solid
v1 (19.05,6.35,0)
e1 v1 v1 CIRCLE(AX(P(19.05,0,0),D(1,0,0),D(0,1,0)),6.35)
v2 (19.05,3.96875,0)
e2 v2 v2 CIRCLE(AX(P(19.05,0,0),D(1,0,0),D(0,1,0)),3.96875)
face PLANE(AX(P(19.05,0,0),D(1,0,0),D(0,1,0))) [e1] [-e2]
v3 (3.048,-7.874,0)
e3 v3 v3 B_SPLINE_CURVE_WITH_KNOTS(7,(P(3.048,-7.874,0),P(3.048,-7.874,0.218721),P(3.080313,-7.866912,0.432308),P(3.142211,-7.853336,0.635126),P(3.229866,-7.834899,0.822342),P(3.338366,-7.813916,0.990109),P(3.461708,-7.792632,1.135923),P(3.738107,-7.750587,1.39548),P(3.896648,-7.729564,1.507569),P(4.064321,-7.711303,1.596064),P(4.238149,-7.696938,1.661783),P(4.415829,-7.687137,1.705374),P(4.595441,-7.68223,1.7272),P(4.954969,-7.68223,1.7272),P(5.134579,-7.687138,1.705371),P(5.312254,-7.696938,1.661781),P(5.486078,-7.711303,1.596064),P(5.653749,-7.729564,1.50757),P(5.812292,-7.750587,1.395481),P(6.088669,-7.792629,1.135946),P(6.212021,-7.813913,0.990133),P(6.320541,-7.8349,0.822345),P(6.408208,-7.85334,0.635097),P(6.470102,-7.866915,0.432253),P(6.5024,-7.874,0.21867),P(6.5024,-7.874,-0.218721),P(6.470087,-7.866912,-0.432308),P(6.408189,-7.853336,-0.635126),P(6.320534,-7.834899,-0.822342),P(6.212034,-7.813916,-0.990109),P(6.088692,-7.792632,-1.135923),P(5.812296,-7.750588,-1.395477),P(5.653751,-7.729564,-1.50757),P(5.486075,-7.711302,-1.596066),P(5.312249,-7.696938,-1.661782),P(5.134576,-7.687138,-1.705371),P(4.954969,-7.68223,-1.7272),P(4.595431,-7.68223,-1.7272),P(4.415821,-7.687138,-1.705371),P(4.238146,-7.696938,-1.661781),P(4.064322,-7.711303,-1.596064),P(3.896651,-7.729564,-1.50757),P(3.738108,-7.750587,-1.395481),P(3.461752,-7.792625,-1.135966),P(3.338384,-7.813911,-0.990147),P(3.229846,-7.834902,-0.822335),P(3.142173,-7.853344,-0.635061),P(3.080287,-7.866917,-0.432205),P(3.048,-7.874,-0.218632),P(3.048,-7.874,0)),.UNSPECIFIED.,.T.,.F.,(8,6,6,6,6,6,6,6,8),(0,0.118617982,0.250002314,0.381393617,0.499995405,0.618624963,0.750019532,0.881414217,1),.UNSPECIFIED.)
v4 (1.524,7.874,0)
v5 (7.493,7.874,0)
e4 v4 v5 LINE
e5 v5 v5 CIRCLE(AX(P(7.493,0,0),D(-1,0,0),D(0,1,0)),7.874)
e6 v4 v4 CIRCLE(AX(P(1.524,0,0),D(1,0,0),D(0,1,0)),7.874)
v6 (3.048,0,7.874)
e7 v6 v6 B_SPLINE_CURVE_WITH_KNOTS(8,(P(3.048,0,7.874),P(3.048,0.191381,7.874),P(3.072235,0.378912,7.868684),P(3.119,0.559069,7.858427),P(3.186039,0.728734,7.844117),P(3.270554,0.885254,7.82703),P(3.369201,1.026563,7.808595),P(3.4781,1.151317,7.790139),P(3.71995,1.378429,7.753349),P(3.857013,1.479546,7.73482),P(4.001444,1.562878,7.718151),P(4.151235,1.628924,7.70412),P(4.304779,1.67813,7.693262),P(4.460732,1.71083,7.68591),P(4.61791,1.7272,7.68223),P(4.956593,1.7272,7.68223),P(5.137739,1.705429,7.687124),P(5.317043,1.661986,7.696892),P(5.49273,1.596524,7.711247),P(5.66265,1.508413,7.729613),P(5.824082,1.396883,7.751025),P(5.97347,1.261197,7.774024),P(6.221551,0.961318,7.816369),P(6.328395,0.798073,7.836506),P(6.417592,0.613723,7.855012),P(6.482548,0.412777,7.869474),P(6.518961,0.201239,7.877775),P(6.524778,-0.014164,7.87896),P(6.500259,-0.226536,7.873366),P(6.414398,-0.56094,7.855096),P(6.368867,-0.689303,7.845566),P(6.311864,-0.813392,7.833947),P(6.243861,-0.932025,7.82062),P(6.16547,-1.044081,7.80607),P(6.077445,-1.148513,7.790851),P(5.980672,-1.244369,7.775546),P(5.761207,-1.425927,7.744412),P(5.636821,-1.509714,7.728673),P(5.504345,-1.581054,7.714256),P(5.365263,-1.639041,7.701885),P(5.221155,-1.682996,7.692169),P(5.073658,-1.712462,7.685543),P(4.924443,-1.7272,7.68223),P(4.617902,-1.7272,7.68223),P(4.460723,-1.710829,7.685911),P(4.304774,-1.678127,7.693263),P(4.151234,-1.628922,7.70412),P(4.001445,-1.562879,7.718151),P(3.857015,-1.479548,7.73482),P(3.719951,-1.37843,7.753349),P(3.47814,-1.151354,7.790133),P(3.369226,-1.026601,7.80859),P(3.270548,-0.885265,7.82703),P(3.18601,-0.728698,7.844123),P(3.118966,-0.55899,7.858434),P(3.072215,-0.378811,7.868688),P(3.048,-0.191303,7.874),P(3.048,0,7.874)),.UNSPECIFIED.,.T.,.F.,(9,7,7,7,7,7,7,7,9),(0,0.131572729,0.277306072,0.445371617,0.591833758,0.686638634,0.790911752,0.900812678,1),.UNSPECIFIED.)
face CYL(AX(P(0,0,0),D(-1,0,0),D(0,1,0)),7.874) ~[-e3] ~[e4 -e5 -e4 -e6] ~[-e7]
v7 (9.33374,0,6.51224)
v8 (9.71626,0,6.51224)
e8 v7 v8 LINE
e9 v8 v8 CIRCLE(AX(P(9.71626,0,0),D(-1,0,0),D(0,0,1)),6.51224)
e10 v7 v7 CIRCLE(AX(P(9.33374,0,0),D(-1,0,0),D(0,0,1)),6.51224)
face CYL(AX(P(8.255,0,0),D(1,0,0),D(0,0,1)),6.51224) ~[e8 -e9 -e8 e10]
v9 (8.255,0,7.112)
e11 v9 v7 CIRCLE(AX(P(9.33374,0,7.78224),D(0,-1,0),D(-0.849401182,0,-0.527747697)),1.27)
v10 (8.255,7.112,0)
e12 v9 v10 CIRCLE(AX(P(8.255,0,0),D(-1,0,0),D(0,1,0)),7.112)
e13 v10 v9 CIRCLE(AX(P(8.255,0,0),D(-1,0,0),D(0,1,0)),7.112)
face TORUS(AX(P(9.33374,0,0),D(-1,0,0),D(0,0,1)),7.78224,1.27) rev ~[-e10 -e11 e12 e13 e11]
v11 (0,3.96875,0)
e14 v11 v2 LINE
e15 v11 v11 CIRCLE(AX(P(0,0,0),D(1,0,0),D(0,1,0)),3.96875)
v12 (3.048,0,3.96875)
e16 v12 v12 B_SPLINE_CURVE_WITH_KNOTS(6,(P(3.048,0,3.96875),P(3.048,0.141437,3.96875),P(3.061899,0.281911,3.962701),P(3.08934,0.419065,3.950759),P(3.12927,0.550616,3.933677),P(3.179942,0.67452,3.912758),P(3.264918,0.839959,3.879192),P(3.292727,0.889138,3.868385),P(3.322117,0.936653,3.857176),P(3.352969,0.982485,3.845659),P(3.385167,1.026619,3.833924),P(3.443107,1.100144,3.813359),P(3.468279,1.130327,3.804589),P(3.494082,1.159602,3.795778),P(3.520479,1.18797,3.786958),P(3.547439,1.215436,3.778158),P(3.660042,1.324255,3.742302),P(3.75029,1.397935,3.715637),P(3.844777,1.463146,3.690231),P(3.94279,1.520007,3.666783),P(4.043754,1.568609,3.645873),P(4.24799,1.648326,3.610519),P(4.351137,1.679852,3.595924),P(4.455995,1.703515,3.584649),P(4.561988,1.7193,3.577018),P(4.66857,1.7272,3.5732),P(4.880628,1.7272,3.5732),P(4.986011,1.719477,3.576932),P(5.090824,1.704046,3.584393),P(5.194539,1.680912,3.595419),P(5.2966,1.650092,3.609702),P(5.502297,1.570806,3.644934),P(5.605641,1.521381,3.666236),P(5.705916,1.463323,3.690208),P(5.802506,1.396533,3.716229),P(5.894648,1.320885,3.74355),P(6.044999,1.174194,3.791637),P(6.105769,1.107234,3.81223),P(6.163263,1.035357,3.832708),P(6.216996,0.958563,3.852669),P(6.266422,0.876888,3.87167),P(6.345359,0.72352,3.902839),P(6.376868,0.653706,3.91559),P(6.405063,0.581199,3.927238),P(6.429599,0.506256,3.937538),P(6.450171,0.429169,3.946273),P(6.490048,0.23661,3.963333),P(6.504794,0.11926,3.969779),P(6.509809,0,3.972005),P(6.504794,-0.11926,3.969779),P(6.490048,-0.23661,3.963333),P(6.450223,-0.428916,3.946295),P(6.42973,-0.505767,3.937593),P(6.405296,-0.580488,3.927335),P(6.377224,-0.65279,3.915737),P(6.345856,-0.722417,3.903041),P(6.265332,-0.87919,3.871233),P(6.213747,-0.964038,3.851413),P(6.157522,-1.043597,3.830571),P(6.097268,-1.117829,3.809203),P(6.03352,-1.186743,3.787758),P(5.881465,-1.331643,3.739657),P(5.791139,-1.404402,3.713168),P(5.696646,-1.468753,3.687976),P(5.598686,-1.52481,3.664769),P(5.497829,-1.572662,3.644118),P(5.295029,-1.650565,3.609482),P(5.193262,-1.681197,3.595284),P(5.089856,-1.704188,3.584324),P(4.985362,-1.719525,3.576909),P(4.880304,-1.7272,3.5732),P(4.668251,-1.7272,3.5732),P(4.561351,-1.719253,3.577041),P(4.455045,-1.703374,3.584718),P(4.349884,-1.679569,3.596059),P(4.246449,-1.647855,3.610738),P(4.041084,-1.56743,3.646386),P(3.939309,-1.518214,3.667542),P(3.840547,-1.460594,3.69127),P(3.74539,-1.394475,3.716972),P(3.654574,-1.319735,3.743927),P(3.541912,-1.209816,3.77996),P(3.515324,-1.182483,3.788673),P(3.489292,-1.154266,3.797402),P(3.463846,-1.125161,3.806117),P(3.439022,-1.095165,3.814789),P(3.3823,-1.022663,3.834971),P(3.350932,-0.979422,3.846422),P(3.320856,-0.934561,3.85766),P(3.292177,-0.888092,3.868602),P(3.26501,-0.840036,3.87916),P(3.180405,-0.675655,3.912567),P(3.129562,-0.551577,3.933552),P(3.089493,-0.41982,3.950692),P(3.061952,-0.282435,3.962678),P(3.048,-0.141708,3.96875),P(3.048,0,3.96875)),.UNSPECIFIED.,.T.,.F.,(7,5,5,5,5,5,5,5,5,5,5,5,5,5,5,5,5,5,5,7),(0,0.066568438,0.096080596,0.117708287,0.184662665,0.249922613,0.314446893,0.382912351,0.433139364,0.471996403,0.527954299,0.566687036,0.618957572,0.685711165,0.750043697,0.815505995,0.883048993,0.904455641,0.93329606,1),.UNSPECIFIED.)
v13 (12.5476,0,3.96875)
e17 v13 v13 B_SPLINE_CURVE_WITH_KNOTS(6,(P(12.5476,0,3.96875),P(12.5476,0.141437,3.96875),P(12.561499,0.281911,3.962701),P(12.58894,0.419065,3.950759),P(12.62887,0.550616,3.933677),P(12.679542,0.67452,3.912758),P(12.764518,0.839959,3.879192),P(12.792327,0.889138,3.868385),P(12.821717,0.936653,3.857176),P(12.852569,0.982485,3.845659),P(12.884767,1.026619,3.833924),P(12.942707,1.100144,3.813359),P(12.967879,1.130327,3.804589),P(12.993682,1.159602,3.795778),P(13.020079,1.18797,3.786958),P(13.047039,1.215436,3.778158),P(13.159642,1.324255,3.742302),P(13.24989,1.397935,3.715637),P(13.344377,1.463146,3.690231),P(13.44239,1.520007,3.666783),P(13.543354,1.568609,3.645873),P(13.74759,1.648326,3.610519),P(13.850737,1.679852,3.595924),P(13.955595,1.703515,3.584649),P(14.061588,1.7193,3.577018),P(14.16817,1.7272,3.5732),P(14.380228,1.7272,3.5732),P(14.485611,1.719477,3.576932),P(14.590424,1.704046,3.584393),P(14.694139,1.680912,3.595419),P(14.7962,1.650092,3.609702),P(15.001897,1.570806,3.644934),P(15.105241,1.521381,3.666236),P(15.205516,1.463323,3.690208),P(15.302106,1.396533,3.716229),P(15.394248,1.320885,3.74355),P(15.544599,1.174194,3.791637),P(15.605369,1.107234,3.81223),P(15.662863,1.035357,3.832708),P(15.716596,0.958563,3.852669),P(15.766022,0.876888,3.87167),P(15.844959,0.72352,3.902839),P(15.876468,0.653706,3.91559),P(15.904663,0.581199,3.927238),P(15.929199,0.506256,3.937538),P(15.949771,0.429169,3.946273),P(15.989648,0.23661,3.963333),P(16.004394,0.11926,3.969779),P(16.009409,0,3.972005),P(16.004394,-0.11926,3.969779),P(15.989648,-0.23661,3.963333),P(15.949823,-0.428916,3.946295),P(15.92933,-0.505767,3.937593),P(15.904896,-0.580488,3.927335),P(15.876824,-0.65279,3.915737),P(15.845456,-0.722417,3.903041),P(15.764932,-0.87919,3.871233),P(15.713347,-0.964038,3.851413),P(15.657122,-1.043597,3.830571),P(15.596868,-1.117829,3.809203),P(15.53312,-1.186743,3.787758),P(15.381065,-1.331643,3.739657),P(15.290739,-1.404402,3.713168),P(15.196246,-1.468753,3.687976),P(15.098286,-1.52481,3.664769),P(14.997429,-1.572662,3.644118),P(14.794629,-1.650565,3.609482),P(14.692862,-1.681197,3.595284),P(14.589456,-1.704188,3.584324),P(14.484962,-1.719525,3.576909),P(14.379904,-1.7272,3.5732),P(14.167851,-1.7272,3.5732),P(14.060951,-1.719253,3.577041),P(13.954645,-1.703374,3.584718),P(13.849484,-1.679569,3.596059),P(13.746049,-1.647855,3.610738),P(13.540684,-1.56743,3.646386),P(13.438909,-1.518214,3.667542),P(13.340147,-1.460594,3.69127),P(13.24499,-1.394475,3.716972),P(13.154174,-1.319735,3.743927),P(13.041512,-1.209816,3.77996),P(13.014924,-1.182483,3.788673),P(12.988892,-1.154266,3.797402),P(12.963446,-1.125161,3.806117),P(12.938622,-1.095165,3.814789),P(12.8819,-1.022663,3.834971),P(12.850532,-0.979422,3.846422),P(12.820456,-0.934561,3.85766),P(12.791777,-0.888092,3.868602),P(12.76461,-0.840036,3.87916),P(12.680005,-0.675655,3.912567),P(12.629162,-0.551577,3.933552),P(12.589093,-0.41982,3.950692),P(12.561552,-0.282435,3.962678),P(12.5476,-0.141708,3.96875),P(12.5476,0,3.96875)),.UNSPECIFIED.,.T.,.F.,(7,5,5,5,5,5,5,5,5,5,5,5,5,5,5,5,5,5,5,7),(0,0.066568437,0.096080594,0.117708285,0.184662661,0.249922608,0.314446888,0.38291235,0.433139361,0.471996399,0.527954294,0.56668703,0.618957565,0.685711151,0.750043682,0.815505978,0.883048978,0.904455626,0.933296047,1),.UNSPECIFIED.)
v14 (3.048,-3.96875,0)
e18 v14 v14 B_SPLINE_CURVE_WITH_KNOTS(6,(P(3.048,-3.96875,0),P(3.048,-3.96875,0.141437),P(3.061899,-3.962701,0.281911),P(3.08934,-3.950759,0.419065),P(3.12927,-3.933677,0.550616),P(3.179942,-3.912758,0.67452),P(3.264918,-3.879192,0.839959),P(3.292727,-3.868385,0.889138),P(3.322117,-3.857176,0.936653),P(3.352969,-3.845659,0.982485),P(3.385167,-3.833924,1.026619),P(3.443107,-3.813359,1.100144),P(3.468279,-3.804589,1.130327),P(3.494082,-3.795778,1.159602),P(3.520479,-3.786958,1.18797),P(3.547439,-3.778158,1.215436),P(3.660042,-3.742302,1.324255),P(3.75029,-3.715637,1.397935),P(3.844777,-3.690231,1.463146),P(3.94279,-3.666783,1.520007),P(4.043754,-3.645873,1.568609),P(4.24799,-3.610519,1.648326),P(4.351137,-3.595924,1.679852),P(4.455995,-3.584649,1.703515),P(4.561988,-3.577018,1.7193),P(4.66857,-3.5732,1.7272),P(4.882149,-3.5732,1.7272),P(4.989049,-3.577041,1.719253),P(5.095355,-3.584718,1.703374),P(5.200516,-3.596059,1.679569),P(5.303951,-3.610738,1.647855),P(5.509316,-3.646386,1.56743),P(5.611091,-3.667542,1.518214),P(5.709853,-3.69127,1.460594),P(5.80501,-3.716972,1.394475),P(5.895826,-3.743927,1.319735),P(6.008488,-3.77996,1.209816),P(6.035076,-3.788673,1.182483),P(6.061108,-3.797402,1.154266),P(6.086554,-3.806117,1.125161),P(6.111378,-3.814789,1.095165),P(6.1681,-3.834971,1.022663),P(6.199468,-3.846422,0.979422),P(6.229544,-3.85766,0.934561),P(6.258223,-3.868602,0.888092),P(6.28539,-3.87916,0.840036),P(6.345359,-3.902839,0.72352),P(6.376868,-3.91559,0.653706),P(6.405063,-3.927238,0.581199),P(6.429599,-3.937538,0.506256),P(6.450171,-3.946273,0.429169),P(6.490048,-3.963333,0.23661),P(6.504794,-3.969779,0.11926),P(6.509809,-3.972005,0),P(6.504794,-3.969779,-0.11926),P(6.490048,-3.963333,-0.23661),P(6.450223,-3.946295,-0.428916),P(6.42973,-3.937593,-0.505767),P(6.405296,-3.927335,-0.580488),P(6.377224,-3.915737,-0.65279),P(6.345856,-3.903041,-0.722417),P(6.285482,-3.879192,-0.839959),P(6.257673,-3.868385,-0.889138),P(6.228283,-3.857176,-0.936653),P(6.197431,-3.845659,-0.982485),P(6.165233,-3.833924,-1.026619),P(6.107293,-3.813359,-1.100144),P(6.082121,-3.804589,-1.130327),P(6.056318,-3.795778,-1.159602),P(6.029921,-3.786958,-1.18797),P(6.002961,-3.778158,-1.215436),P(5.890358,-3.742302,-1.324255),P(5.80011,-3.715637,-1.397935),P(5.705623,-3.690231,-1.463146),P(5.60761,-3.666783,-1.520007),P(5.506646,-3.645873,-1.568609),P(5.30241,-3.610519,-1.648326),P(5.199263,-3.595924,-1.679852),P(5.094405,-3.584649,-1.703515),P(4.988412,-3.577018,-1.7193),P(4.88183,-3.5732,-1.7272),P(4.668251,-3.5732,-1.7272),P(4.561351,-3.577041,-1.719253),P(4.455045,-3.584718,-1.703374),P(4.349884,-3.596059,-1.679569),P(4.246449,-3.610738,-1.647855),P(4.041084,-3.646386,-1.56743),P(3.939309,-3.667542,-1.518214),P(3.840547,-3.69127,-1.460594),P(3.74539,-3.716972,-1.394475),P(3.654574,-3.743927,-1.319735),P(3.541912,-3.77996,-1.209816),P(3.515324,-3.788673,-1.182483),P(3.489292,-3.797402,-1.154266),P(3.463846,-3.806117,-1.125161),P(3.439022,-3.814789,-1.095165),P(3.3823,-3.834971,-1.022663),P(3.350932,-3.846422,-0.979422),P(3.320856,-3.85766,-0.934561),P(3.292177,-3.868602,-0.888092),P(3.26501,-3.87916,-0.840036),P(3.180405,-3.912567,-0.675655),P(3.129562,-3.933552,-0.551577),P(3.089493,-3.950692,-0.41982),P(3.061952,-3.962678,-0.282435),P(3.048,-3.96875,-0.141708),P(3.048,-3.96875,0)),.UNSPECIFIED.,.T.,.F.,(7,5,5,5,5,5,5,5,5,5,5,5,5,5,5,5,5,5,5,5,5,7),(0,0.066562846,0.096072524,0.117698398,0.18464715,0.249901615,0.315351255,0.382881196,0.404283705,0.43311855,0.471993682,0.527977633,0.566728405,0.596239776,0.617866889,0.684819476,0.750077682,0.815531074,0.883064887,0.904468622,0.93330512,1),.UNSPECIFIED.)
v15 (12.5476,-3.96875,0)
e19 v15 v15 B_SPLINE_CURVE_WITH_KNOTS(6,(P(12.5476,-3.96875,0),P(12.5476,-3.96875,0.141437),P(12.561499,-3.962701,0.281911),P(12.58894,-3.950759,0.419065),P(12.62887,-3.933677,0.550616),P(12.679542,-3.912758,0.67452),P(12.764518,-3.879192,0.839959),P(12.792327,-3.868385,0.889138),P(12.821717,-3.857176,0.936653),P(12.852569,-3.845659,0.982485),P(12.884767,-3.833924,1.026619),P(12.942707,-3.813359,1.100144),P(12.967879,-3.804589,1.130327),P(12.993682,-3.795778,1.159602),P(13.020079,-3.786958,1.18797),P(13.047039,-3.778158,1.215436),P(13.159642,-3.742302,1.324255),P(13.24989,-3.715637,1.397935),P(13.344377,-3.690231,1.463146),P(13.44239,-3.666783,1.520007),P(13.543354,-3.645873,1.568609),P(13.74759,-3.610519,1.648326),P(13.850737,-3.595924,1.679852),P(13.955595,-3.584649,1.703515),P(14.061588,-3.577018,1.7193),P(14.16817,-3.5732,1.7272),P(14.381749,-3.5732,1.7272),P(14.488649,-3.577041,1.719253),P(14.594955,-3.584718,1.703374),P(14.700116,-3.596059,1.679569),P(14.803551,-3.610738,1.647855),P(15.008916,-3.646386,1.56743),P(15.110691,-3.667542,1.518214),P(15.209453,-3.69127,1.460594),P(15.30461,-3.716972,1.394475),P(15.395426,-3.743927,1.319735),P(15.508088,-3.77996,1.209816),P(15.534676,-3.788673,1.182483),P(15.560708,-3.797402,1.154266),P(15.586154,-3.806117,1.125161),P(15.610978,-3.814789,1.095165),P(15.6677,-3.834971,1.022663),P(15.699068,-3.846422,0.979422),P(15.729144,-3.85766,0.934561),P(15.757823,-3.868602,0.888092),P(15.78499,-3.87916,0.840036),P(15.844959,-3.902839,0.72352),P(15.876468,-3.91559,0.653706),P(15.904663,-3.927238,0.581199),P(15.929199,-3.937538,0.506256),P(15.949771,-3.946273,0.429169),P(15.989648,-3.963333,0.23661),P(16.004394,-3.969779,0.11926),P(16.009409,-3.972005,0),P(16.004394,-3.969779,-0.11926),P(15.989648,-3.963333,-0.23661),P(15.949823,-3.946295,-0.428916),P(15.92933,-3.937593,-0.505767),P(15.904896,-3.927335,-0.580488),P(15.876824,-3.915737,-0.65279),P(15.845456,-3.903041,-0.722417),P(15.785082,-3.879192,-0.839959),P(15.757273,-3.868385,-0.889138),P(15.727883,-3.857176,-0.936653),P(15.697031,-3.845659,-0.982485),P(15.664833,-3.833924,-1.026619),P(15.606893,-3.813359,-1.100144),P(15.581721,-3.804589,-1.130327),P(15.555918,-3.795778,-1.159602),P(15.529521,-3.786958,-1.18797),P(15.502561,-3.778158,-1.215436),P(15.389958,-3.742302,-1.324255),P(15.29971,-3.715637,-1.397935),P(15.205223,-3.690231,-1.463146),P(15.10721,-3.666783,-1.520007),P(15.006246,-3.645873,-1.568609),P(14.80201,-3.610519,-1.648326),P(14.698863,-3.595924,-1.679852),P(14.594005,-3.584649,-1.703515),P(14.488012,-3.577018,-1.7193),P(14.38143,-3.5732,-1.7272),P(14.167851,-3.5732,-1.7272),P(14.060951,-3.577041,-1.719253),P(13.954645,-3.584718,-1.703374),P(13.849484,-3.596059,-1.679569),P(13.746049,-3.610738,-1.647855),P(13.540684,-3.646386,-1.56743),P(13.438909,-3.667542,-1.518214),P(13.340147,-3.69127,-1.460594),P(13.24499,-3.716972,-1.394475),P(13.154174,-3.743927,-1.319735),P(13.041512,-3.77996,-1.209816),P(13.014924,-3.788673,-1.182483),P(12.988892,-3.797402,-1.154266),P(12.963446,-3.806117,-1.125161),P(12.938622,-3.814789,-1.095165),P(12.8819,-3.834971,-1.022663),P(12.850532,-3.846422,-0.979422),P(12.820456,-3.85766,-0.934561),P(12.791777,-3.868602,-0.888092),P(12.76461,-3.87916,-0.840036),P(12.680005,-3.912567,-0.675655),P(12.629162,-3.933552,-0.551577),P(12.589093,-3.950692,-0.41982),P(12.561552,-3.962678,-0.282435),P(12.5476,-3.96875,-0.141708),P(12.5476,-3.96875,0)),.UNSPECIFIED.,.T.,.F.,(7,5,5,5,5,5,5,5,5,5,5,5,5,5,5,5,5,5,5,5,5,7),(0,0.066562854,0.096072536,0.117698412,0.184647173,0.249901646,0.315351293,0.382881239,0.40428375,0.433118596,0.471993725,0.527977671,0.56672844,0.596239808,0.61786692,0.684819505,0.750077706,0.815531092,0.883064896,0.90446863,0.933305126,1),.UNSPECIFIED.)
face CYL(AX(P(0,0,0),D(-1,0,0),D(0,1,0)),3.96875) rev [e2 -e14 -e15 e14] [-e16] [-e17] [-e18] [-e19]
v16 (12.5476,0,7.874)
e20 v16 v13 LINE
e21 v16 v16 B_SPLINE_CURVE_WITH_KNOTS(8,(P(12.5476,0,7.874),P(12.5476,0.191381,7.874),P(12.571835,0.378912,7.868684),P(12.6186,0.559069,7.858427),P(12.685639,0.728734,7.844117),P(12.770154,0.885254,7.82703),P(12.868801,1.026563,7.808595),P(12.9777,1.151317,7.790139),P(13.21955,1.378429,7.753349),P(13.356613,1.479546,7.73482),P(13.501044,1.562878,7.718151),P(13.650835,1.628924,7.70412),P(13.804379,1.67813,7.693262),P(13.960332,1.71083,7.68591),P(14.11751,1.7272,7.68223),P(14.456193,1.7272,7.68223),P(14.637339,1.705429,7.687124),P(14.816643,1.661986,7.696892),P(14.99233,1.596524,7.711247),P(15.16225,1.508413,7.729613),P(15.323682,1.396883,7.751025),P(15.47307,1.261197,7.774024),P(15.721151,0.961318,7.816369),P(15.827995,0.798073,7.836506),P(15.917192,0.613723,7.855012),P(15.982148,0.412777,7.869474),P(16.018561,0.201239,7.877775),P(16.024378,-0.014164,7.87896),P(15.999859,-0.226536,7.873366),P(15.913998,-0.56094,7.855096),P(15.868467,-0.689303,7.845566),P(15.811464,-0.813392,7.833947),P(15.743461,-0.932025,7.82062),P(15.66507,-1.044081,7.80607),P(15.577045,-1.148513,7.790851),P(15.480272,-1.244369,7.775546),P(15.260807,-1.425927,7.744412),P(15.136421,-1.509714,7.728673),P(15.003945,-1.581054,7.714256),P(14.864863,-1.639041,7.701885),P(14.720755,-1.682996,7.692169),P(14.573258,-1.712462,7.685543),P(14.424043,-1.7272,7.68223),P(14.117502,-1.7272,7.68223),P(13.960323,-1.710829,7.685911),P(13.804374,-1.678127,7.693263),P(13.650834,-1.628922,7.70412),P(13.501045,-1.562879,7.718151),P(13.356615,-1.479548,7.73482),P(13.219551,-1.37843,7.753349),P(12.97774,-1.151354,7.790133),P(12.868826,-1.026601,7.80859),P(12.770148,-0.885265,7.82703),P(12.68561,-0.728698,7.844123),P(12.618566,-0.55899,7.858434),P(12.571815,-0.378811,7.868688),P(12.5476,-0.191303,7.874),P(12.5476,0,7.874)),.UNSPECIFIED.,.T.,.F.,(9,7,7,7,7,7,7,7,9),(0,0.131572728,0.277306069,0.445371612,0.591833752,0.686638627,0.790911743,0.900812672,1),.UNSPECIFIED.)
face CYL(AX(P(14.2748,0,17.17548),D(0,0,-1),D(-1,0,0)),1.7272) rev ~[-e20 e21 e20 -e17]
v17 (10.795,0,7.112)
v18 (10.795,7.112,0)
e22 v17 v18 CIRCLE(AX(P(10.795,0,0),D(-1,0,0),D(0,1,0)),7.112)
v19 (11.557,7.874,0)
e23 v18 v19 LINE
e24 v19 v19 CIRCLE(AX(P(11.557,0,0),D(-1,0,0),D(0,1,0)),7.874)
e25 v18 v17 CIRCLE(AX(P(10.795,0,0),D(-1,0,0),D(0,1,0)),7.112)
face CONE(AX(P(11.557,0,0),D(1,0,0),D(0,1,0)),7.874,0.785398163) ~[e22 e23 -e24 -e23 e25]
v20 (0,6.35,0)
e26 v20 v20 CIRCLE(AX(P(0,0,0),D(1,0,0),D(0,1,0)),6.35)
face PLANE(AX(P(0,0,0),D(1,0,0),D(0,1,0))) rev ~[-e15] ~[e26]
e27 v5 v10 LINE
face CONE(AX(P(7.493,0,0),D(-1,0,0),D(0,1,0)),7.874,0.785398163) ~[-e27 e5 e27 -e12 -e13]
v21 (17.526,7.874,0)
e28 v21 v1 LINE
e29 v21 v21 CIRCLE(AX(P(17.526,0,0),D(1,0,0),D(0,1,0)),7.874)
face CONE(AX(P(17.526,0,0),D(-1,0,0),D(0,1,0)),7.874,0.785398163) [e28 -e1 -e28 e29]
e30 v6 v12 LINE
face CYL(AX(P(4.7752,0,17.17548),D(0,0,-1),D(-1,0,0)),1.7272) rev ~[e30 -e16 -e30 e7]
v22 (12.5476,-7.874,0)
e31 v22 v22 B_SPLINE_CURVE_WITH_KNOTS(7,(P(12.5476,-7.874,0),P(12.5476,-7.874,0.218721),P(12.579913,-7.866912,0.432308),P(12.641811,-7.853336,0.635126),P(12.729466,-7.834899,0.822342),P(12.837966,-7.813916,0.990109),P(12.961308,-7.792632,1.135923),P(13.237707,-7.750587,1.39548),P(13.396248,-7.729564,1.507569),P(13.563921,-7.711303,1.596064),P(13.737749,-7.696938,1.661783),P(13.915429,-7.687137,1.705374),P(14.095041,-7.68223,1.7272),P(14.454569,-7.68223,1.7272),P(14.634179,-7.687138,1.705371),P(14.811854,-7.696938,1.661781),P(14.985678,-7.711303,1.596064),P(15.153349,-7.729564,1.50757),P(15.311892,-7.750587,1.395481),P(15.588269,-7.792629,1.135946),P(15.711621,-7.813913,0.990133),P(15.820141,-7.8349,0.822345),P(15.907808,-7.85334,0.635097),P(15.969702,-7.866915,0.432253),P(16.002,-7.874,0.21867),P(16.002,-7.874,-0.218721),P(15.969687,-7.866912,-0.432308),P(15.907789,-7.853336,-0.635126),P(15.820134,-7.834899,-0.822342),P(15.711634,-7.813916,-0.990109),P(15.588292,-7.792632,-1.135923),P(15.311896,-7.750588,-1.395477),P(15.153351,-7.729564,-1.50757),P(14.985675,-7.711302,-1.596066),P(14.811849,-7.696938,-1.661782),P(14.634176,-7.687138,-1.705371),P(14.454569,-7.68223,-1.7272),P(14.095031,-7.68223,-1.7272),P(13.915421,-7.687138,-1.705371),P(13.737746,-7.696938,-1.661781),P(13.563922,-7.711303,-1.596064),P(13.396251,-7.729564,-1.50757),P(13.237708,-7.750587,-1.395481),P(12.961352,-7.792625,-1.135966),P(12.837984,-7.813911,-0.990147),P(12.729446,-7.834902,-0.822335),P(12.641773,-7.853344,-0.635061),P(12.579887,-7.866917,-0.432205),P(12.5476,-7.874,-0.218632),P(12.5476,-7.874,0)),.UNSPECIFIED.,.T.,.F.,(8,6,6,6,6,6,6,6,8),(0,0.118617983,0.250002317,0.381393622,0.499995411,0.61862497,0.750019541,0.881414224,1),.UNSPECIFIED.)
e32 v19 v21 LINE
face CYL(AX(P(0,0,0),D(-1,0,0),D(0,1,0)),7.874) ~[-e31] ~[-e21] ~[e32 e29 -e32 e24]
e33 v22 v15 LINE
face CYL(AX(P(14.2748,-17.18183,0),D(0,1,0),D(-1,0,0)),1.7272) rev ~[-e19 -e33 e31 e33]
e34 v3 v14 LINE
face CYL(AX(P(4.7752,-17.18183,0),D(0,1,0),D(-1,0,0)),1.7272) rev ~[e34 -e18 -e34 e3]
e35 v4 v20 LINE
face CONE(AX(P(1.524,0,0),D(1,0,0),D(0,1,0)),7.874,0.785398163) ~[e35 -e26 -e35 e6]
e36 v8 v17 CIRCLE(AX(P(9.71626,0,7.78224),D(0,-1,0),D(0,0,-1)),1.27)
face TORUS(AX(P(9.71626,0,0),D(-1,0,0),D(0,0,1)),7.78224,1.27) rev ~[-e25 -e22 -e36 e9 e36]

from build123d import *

# Parameters (mm, degrees)
F0_R      = 7.874
F0_R_2    = 3.96875
F1_DEPTH  = 19.05
F2_SIZE2  = 1.524
F2_SIZE   = 1.524
F5_D      = 3.4544
F5_DEPTH  = 9.49325
F5_START  = 0.9537702
F5_TIP    = 1.0378064612
F8_D      = 3.4544
F8_DEPTH  = 9.4996
F8_START  = 0.9537702
F8_TIP    = 1.0378064612
F11_SIZE2 = 0.762
F11_SIZE  = 0.762


# Not quite as in the source:
# - a fillet or chamfer that OpenCascade refuses, or shapes differently, is made with other operations: its cross-section is extruded or revolved along the edge and cut away or added


with BuildPart() as f1:
    # F0 (on Right) → F1 (new body)
    with BuildSketch(Plane.YZ):
        Circle(F0_R)
        Circle(F0_R_2, mode=Mode.SUBTRACT)
    extrude(amount=F1_DEPTH)

    # F2
    f2_edges = [f1.edges().sort_by_distance(p)[0] for p in [
        (19.05, -7.874, 0),
        (0, -7.874, 0),
    ]]
    chamfer(f2_edges, length=F2_SIZE, length2=F2_SIZE2)

    # F5
    # its depths count from where the whole tool has entered the part; down to there all is cleared
    with Locations(Plane.XY.offset(8.636).offset(-F5_START)):
        with Locations((4.7752, 0), (14.2748, 0)):
            Hole(F5_D / 2, depth=F5_DEPTH)
            with Locations((0, 0, -(F5_DEPTH + F5_TIP / 2))):  # 118° drill point
                Cone(0, F5_D / 2, F5_TIP, mode=Mode.SUBTRACT)

    # F8
    # its depths count from where the whole tool has entered the part; down to there all is cleared
    with Locations(Plane.XZ.offset(8.636).offset(-F8_START)):
        with Locations((4.7752, 0), (14.2748, 0)):
            Hole(F8_D / 2, depth=F8_DEPTH)
            with Locations((0, 0, -(F8_DEPTH + F8_TIP / 2))):  # 118° drill point
                Cone(0, F8_D / 2, F8_TIP, mode=Mode.SUBTRACT)

    # F9 (on Front) → F10 (revolve, cut)
    with BuildSketch(Plane.XZ):
        Polygon((10.795, 8.9425863698), (9.525, 8.9425863698), (8.255, 8.9425863698), (8.255, 6.5122395754), (10.795, 6.5122395754), align=None)
    revolve(axis=Axis((-2.5821820018, 0, 0), (-1, 0, 0)), mode=Mode.SUBTRACT)

    # F11
    f11_edges = [f1.edges().sort_by_distance(p)[0] for p in [
        (8.255, -7.874, 0),
        (10.795, -7.874, 0),
    ]]
    chamfer(f11_edges, length=F11_SIZE, length2=F11_SIZE2)

    # F12: fillet of radius 1.27 on 2 edges, made by hand

    # F12_s1 → F12_t2 (revolve)
    with BuildSketch(Plane.XZ):
        with BuildLine():
            ThreePointArc((8.255, 7.112), (8.7166107711, 6.6722611385), (9.3337395013, 6.5122395754))
            Line((9.3337395013, 6.5122395754), (9.3337395013, 6.4868395754))
            Line((9.3337395013, 6.4868395754), (8.255, 6.4868395754))
            Line((8.255, 6.4868395754), (8.2296, 6.5122395754))
            ThreePointArc((8.2296, 6.5122395754), (8.2296, 6.8121197877), (8.23342521, 7.0985952085))
            Line((8.23342521, 7.0985952085), (8.255, 7.112))
        make_face()
    revolve(axis=Axis((8.255, 0, 0), (-1, 0, 0)))

    # F12_s3 → F12_t4 (revolve)
    with BuildSketch(Plane.XZ):
        with BuildLine():
            ThreePointArc((9.7162604987, 6.5122395754), (10.3333892289, 6.6722611385), (10.795, 7.112))
            Line((10.795, 7.112), (10.81657479, 7.0985952085))
            ThreePointArc((10.81657479, 7.0985952085), (10.8204, 6.8121197877), (10.8204, 6.5122395754))
            Line((10.8204, 6.5122395754), (10.795, 6.4868395754))
            Line((10.795, 6.4868395754), (9.7162604987, 6.4868395754))
            Line((9.7162604987, 6.4868395754), (9.7162604987, 6.5122395754))
        make_face()
    revolve(axis=Axis((10.795, 0, 0), (-1, 0, 0)))


solid = f1.part
